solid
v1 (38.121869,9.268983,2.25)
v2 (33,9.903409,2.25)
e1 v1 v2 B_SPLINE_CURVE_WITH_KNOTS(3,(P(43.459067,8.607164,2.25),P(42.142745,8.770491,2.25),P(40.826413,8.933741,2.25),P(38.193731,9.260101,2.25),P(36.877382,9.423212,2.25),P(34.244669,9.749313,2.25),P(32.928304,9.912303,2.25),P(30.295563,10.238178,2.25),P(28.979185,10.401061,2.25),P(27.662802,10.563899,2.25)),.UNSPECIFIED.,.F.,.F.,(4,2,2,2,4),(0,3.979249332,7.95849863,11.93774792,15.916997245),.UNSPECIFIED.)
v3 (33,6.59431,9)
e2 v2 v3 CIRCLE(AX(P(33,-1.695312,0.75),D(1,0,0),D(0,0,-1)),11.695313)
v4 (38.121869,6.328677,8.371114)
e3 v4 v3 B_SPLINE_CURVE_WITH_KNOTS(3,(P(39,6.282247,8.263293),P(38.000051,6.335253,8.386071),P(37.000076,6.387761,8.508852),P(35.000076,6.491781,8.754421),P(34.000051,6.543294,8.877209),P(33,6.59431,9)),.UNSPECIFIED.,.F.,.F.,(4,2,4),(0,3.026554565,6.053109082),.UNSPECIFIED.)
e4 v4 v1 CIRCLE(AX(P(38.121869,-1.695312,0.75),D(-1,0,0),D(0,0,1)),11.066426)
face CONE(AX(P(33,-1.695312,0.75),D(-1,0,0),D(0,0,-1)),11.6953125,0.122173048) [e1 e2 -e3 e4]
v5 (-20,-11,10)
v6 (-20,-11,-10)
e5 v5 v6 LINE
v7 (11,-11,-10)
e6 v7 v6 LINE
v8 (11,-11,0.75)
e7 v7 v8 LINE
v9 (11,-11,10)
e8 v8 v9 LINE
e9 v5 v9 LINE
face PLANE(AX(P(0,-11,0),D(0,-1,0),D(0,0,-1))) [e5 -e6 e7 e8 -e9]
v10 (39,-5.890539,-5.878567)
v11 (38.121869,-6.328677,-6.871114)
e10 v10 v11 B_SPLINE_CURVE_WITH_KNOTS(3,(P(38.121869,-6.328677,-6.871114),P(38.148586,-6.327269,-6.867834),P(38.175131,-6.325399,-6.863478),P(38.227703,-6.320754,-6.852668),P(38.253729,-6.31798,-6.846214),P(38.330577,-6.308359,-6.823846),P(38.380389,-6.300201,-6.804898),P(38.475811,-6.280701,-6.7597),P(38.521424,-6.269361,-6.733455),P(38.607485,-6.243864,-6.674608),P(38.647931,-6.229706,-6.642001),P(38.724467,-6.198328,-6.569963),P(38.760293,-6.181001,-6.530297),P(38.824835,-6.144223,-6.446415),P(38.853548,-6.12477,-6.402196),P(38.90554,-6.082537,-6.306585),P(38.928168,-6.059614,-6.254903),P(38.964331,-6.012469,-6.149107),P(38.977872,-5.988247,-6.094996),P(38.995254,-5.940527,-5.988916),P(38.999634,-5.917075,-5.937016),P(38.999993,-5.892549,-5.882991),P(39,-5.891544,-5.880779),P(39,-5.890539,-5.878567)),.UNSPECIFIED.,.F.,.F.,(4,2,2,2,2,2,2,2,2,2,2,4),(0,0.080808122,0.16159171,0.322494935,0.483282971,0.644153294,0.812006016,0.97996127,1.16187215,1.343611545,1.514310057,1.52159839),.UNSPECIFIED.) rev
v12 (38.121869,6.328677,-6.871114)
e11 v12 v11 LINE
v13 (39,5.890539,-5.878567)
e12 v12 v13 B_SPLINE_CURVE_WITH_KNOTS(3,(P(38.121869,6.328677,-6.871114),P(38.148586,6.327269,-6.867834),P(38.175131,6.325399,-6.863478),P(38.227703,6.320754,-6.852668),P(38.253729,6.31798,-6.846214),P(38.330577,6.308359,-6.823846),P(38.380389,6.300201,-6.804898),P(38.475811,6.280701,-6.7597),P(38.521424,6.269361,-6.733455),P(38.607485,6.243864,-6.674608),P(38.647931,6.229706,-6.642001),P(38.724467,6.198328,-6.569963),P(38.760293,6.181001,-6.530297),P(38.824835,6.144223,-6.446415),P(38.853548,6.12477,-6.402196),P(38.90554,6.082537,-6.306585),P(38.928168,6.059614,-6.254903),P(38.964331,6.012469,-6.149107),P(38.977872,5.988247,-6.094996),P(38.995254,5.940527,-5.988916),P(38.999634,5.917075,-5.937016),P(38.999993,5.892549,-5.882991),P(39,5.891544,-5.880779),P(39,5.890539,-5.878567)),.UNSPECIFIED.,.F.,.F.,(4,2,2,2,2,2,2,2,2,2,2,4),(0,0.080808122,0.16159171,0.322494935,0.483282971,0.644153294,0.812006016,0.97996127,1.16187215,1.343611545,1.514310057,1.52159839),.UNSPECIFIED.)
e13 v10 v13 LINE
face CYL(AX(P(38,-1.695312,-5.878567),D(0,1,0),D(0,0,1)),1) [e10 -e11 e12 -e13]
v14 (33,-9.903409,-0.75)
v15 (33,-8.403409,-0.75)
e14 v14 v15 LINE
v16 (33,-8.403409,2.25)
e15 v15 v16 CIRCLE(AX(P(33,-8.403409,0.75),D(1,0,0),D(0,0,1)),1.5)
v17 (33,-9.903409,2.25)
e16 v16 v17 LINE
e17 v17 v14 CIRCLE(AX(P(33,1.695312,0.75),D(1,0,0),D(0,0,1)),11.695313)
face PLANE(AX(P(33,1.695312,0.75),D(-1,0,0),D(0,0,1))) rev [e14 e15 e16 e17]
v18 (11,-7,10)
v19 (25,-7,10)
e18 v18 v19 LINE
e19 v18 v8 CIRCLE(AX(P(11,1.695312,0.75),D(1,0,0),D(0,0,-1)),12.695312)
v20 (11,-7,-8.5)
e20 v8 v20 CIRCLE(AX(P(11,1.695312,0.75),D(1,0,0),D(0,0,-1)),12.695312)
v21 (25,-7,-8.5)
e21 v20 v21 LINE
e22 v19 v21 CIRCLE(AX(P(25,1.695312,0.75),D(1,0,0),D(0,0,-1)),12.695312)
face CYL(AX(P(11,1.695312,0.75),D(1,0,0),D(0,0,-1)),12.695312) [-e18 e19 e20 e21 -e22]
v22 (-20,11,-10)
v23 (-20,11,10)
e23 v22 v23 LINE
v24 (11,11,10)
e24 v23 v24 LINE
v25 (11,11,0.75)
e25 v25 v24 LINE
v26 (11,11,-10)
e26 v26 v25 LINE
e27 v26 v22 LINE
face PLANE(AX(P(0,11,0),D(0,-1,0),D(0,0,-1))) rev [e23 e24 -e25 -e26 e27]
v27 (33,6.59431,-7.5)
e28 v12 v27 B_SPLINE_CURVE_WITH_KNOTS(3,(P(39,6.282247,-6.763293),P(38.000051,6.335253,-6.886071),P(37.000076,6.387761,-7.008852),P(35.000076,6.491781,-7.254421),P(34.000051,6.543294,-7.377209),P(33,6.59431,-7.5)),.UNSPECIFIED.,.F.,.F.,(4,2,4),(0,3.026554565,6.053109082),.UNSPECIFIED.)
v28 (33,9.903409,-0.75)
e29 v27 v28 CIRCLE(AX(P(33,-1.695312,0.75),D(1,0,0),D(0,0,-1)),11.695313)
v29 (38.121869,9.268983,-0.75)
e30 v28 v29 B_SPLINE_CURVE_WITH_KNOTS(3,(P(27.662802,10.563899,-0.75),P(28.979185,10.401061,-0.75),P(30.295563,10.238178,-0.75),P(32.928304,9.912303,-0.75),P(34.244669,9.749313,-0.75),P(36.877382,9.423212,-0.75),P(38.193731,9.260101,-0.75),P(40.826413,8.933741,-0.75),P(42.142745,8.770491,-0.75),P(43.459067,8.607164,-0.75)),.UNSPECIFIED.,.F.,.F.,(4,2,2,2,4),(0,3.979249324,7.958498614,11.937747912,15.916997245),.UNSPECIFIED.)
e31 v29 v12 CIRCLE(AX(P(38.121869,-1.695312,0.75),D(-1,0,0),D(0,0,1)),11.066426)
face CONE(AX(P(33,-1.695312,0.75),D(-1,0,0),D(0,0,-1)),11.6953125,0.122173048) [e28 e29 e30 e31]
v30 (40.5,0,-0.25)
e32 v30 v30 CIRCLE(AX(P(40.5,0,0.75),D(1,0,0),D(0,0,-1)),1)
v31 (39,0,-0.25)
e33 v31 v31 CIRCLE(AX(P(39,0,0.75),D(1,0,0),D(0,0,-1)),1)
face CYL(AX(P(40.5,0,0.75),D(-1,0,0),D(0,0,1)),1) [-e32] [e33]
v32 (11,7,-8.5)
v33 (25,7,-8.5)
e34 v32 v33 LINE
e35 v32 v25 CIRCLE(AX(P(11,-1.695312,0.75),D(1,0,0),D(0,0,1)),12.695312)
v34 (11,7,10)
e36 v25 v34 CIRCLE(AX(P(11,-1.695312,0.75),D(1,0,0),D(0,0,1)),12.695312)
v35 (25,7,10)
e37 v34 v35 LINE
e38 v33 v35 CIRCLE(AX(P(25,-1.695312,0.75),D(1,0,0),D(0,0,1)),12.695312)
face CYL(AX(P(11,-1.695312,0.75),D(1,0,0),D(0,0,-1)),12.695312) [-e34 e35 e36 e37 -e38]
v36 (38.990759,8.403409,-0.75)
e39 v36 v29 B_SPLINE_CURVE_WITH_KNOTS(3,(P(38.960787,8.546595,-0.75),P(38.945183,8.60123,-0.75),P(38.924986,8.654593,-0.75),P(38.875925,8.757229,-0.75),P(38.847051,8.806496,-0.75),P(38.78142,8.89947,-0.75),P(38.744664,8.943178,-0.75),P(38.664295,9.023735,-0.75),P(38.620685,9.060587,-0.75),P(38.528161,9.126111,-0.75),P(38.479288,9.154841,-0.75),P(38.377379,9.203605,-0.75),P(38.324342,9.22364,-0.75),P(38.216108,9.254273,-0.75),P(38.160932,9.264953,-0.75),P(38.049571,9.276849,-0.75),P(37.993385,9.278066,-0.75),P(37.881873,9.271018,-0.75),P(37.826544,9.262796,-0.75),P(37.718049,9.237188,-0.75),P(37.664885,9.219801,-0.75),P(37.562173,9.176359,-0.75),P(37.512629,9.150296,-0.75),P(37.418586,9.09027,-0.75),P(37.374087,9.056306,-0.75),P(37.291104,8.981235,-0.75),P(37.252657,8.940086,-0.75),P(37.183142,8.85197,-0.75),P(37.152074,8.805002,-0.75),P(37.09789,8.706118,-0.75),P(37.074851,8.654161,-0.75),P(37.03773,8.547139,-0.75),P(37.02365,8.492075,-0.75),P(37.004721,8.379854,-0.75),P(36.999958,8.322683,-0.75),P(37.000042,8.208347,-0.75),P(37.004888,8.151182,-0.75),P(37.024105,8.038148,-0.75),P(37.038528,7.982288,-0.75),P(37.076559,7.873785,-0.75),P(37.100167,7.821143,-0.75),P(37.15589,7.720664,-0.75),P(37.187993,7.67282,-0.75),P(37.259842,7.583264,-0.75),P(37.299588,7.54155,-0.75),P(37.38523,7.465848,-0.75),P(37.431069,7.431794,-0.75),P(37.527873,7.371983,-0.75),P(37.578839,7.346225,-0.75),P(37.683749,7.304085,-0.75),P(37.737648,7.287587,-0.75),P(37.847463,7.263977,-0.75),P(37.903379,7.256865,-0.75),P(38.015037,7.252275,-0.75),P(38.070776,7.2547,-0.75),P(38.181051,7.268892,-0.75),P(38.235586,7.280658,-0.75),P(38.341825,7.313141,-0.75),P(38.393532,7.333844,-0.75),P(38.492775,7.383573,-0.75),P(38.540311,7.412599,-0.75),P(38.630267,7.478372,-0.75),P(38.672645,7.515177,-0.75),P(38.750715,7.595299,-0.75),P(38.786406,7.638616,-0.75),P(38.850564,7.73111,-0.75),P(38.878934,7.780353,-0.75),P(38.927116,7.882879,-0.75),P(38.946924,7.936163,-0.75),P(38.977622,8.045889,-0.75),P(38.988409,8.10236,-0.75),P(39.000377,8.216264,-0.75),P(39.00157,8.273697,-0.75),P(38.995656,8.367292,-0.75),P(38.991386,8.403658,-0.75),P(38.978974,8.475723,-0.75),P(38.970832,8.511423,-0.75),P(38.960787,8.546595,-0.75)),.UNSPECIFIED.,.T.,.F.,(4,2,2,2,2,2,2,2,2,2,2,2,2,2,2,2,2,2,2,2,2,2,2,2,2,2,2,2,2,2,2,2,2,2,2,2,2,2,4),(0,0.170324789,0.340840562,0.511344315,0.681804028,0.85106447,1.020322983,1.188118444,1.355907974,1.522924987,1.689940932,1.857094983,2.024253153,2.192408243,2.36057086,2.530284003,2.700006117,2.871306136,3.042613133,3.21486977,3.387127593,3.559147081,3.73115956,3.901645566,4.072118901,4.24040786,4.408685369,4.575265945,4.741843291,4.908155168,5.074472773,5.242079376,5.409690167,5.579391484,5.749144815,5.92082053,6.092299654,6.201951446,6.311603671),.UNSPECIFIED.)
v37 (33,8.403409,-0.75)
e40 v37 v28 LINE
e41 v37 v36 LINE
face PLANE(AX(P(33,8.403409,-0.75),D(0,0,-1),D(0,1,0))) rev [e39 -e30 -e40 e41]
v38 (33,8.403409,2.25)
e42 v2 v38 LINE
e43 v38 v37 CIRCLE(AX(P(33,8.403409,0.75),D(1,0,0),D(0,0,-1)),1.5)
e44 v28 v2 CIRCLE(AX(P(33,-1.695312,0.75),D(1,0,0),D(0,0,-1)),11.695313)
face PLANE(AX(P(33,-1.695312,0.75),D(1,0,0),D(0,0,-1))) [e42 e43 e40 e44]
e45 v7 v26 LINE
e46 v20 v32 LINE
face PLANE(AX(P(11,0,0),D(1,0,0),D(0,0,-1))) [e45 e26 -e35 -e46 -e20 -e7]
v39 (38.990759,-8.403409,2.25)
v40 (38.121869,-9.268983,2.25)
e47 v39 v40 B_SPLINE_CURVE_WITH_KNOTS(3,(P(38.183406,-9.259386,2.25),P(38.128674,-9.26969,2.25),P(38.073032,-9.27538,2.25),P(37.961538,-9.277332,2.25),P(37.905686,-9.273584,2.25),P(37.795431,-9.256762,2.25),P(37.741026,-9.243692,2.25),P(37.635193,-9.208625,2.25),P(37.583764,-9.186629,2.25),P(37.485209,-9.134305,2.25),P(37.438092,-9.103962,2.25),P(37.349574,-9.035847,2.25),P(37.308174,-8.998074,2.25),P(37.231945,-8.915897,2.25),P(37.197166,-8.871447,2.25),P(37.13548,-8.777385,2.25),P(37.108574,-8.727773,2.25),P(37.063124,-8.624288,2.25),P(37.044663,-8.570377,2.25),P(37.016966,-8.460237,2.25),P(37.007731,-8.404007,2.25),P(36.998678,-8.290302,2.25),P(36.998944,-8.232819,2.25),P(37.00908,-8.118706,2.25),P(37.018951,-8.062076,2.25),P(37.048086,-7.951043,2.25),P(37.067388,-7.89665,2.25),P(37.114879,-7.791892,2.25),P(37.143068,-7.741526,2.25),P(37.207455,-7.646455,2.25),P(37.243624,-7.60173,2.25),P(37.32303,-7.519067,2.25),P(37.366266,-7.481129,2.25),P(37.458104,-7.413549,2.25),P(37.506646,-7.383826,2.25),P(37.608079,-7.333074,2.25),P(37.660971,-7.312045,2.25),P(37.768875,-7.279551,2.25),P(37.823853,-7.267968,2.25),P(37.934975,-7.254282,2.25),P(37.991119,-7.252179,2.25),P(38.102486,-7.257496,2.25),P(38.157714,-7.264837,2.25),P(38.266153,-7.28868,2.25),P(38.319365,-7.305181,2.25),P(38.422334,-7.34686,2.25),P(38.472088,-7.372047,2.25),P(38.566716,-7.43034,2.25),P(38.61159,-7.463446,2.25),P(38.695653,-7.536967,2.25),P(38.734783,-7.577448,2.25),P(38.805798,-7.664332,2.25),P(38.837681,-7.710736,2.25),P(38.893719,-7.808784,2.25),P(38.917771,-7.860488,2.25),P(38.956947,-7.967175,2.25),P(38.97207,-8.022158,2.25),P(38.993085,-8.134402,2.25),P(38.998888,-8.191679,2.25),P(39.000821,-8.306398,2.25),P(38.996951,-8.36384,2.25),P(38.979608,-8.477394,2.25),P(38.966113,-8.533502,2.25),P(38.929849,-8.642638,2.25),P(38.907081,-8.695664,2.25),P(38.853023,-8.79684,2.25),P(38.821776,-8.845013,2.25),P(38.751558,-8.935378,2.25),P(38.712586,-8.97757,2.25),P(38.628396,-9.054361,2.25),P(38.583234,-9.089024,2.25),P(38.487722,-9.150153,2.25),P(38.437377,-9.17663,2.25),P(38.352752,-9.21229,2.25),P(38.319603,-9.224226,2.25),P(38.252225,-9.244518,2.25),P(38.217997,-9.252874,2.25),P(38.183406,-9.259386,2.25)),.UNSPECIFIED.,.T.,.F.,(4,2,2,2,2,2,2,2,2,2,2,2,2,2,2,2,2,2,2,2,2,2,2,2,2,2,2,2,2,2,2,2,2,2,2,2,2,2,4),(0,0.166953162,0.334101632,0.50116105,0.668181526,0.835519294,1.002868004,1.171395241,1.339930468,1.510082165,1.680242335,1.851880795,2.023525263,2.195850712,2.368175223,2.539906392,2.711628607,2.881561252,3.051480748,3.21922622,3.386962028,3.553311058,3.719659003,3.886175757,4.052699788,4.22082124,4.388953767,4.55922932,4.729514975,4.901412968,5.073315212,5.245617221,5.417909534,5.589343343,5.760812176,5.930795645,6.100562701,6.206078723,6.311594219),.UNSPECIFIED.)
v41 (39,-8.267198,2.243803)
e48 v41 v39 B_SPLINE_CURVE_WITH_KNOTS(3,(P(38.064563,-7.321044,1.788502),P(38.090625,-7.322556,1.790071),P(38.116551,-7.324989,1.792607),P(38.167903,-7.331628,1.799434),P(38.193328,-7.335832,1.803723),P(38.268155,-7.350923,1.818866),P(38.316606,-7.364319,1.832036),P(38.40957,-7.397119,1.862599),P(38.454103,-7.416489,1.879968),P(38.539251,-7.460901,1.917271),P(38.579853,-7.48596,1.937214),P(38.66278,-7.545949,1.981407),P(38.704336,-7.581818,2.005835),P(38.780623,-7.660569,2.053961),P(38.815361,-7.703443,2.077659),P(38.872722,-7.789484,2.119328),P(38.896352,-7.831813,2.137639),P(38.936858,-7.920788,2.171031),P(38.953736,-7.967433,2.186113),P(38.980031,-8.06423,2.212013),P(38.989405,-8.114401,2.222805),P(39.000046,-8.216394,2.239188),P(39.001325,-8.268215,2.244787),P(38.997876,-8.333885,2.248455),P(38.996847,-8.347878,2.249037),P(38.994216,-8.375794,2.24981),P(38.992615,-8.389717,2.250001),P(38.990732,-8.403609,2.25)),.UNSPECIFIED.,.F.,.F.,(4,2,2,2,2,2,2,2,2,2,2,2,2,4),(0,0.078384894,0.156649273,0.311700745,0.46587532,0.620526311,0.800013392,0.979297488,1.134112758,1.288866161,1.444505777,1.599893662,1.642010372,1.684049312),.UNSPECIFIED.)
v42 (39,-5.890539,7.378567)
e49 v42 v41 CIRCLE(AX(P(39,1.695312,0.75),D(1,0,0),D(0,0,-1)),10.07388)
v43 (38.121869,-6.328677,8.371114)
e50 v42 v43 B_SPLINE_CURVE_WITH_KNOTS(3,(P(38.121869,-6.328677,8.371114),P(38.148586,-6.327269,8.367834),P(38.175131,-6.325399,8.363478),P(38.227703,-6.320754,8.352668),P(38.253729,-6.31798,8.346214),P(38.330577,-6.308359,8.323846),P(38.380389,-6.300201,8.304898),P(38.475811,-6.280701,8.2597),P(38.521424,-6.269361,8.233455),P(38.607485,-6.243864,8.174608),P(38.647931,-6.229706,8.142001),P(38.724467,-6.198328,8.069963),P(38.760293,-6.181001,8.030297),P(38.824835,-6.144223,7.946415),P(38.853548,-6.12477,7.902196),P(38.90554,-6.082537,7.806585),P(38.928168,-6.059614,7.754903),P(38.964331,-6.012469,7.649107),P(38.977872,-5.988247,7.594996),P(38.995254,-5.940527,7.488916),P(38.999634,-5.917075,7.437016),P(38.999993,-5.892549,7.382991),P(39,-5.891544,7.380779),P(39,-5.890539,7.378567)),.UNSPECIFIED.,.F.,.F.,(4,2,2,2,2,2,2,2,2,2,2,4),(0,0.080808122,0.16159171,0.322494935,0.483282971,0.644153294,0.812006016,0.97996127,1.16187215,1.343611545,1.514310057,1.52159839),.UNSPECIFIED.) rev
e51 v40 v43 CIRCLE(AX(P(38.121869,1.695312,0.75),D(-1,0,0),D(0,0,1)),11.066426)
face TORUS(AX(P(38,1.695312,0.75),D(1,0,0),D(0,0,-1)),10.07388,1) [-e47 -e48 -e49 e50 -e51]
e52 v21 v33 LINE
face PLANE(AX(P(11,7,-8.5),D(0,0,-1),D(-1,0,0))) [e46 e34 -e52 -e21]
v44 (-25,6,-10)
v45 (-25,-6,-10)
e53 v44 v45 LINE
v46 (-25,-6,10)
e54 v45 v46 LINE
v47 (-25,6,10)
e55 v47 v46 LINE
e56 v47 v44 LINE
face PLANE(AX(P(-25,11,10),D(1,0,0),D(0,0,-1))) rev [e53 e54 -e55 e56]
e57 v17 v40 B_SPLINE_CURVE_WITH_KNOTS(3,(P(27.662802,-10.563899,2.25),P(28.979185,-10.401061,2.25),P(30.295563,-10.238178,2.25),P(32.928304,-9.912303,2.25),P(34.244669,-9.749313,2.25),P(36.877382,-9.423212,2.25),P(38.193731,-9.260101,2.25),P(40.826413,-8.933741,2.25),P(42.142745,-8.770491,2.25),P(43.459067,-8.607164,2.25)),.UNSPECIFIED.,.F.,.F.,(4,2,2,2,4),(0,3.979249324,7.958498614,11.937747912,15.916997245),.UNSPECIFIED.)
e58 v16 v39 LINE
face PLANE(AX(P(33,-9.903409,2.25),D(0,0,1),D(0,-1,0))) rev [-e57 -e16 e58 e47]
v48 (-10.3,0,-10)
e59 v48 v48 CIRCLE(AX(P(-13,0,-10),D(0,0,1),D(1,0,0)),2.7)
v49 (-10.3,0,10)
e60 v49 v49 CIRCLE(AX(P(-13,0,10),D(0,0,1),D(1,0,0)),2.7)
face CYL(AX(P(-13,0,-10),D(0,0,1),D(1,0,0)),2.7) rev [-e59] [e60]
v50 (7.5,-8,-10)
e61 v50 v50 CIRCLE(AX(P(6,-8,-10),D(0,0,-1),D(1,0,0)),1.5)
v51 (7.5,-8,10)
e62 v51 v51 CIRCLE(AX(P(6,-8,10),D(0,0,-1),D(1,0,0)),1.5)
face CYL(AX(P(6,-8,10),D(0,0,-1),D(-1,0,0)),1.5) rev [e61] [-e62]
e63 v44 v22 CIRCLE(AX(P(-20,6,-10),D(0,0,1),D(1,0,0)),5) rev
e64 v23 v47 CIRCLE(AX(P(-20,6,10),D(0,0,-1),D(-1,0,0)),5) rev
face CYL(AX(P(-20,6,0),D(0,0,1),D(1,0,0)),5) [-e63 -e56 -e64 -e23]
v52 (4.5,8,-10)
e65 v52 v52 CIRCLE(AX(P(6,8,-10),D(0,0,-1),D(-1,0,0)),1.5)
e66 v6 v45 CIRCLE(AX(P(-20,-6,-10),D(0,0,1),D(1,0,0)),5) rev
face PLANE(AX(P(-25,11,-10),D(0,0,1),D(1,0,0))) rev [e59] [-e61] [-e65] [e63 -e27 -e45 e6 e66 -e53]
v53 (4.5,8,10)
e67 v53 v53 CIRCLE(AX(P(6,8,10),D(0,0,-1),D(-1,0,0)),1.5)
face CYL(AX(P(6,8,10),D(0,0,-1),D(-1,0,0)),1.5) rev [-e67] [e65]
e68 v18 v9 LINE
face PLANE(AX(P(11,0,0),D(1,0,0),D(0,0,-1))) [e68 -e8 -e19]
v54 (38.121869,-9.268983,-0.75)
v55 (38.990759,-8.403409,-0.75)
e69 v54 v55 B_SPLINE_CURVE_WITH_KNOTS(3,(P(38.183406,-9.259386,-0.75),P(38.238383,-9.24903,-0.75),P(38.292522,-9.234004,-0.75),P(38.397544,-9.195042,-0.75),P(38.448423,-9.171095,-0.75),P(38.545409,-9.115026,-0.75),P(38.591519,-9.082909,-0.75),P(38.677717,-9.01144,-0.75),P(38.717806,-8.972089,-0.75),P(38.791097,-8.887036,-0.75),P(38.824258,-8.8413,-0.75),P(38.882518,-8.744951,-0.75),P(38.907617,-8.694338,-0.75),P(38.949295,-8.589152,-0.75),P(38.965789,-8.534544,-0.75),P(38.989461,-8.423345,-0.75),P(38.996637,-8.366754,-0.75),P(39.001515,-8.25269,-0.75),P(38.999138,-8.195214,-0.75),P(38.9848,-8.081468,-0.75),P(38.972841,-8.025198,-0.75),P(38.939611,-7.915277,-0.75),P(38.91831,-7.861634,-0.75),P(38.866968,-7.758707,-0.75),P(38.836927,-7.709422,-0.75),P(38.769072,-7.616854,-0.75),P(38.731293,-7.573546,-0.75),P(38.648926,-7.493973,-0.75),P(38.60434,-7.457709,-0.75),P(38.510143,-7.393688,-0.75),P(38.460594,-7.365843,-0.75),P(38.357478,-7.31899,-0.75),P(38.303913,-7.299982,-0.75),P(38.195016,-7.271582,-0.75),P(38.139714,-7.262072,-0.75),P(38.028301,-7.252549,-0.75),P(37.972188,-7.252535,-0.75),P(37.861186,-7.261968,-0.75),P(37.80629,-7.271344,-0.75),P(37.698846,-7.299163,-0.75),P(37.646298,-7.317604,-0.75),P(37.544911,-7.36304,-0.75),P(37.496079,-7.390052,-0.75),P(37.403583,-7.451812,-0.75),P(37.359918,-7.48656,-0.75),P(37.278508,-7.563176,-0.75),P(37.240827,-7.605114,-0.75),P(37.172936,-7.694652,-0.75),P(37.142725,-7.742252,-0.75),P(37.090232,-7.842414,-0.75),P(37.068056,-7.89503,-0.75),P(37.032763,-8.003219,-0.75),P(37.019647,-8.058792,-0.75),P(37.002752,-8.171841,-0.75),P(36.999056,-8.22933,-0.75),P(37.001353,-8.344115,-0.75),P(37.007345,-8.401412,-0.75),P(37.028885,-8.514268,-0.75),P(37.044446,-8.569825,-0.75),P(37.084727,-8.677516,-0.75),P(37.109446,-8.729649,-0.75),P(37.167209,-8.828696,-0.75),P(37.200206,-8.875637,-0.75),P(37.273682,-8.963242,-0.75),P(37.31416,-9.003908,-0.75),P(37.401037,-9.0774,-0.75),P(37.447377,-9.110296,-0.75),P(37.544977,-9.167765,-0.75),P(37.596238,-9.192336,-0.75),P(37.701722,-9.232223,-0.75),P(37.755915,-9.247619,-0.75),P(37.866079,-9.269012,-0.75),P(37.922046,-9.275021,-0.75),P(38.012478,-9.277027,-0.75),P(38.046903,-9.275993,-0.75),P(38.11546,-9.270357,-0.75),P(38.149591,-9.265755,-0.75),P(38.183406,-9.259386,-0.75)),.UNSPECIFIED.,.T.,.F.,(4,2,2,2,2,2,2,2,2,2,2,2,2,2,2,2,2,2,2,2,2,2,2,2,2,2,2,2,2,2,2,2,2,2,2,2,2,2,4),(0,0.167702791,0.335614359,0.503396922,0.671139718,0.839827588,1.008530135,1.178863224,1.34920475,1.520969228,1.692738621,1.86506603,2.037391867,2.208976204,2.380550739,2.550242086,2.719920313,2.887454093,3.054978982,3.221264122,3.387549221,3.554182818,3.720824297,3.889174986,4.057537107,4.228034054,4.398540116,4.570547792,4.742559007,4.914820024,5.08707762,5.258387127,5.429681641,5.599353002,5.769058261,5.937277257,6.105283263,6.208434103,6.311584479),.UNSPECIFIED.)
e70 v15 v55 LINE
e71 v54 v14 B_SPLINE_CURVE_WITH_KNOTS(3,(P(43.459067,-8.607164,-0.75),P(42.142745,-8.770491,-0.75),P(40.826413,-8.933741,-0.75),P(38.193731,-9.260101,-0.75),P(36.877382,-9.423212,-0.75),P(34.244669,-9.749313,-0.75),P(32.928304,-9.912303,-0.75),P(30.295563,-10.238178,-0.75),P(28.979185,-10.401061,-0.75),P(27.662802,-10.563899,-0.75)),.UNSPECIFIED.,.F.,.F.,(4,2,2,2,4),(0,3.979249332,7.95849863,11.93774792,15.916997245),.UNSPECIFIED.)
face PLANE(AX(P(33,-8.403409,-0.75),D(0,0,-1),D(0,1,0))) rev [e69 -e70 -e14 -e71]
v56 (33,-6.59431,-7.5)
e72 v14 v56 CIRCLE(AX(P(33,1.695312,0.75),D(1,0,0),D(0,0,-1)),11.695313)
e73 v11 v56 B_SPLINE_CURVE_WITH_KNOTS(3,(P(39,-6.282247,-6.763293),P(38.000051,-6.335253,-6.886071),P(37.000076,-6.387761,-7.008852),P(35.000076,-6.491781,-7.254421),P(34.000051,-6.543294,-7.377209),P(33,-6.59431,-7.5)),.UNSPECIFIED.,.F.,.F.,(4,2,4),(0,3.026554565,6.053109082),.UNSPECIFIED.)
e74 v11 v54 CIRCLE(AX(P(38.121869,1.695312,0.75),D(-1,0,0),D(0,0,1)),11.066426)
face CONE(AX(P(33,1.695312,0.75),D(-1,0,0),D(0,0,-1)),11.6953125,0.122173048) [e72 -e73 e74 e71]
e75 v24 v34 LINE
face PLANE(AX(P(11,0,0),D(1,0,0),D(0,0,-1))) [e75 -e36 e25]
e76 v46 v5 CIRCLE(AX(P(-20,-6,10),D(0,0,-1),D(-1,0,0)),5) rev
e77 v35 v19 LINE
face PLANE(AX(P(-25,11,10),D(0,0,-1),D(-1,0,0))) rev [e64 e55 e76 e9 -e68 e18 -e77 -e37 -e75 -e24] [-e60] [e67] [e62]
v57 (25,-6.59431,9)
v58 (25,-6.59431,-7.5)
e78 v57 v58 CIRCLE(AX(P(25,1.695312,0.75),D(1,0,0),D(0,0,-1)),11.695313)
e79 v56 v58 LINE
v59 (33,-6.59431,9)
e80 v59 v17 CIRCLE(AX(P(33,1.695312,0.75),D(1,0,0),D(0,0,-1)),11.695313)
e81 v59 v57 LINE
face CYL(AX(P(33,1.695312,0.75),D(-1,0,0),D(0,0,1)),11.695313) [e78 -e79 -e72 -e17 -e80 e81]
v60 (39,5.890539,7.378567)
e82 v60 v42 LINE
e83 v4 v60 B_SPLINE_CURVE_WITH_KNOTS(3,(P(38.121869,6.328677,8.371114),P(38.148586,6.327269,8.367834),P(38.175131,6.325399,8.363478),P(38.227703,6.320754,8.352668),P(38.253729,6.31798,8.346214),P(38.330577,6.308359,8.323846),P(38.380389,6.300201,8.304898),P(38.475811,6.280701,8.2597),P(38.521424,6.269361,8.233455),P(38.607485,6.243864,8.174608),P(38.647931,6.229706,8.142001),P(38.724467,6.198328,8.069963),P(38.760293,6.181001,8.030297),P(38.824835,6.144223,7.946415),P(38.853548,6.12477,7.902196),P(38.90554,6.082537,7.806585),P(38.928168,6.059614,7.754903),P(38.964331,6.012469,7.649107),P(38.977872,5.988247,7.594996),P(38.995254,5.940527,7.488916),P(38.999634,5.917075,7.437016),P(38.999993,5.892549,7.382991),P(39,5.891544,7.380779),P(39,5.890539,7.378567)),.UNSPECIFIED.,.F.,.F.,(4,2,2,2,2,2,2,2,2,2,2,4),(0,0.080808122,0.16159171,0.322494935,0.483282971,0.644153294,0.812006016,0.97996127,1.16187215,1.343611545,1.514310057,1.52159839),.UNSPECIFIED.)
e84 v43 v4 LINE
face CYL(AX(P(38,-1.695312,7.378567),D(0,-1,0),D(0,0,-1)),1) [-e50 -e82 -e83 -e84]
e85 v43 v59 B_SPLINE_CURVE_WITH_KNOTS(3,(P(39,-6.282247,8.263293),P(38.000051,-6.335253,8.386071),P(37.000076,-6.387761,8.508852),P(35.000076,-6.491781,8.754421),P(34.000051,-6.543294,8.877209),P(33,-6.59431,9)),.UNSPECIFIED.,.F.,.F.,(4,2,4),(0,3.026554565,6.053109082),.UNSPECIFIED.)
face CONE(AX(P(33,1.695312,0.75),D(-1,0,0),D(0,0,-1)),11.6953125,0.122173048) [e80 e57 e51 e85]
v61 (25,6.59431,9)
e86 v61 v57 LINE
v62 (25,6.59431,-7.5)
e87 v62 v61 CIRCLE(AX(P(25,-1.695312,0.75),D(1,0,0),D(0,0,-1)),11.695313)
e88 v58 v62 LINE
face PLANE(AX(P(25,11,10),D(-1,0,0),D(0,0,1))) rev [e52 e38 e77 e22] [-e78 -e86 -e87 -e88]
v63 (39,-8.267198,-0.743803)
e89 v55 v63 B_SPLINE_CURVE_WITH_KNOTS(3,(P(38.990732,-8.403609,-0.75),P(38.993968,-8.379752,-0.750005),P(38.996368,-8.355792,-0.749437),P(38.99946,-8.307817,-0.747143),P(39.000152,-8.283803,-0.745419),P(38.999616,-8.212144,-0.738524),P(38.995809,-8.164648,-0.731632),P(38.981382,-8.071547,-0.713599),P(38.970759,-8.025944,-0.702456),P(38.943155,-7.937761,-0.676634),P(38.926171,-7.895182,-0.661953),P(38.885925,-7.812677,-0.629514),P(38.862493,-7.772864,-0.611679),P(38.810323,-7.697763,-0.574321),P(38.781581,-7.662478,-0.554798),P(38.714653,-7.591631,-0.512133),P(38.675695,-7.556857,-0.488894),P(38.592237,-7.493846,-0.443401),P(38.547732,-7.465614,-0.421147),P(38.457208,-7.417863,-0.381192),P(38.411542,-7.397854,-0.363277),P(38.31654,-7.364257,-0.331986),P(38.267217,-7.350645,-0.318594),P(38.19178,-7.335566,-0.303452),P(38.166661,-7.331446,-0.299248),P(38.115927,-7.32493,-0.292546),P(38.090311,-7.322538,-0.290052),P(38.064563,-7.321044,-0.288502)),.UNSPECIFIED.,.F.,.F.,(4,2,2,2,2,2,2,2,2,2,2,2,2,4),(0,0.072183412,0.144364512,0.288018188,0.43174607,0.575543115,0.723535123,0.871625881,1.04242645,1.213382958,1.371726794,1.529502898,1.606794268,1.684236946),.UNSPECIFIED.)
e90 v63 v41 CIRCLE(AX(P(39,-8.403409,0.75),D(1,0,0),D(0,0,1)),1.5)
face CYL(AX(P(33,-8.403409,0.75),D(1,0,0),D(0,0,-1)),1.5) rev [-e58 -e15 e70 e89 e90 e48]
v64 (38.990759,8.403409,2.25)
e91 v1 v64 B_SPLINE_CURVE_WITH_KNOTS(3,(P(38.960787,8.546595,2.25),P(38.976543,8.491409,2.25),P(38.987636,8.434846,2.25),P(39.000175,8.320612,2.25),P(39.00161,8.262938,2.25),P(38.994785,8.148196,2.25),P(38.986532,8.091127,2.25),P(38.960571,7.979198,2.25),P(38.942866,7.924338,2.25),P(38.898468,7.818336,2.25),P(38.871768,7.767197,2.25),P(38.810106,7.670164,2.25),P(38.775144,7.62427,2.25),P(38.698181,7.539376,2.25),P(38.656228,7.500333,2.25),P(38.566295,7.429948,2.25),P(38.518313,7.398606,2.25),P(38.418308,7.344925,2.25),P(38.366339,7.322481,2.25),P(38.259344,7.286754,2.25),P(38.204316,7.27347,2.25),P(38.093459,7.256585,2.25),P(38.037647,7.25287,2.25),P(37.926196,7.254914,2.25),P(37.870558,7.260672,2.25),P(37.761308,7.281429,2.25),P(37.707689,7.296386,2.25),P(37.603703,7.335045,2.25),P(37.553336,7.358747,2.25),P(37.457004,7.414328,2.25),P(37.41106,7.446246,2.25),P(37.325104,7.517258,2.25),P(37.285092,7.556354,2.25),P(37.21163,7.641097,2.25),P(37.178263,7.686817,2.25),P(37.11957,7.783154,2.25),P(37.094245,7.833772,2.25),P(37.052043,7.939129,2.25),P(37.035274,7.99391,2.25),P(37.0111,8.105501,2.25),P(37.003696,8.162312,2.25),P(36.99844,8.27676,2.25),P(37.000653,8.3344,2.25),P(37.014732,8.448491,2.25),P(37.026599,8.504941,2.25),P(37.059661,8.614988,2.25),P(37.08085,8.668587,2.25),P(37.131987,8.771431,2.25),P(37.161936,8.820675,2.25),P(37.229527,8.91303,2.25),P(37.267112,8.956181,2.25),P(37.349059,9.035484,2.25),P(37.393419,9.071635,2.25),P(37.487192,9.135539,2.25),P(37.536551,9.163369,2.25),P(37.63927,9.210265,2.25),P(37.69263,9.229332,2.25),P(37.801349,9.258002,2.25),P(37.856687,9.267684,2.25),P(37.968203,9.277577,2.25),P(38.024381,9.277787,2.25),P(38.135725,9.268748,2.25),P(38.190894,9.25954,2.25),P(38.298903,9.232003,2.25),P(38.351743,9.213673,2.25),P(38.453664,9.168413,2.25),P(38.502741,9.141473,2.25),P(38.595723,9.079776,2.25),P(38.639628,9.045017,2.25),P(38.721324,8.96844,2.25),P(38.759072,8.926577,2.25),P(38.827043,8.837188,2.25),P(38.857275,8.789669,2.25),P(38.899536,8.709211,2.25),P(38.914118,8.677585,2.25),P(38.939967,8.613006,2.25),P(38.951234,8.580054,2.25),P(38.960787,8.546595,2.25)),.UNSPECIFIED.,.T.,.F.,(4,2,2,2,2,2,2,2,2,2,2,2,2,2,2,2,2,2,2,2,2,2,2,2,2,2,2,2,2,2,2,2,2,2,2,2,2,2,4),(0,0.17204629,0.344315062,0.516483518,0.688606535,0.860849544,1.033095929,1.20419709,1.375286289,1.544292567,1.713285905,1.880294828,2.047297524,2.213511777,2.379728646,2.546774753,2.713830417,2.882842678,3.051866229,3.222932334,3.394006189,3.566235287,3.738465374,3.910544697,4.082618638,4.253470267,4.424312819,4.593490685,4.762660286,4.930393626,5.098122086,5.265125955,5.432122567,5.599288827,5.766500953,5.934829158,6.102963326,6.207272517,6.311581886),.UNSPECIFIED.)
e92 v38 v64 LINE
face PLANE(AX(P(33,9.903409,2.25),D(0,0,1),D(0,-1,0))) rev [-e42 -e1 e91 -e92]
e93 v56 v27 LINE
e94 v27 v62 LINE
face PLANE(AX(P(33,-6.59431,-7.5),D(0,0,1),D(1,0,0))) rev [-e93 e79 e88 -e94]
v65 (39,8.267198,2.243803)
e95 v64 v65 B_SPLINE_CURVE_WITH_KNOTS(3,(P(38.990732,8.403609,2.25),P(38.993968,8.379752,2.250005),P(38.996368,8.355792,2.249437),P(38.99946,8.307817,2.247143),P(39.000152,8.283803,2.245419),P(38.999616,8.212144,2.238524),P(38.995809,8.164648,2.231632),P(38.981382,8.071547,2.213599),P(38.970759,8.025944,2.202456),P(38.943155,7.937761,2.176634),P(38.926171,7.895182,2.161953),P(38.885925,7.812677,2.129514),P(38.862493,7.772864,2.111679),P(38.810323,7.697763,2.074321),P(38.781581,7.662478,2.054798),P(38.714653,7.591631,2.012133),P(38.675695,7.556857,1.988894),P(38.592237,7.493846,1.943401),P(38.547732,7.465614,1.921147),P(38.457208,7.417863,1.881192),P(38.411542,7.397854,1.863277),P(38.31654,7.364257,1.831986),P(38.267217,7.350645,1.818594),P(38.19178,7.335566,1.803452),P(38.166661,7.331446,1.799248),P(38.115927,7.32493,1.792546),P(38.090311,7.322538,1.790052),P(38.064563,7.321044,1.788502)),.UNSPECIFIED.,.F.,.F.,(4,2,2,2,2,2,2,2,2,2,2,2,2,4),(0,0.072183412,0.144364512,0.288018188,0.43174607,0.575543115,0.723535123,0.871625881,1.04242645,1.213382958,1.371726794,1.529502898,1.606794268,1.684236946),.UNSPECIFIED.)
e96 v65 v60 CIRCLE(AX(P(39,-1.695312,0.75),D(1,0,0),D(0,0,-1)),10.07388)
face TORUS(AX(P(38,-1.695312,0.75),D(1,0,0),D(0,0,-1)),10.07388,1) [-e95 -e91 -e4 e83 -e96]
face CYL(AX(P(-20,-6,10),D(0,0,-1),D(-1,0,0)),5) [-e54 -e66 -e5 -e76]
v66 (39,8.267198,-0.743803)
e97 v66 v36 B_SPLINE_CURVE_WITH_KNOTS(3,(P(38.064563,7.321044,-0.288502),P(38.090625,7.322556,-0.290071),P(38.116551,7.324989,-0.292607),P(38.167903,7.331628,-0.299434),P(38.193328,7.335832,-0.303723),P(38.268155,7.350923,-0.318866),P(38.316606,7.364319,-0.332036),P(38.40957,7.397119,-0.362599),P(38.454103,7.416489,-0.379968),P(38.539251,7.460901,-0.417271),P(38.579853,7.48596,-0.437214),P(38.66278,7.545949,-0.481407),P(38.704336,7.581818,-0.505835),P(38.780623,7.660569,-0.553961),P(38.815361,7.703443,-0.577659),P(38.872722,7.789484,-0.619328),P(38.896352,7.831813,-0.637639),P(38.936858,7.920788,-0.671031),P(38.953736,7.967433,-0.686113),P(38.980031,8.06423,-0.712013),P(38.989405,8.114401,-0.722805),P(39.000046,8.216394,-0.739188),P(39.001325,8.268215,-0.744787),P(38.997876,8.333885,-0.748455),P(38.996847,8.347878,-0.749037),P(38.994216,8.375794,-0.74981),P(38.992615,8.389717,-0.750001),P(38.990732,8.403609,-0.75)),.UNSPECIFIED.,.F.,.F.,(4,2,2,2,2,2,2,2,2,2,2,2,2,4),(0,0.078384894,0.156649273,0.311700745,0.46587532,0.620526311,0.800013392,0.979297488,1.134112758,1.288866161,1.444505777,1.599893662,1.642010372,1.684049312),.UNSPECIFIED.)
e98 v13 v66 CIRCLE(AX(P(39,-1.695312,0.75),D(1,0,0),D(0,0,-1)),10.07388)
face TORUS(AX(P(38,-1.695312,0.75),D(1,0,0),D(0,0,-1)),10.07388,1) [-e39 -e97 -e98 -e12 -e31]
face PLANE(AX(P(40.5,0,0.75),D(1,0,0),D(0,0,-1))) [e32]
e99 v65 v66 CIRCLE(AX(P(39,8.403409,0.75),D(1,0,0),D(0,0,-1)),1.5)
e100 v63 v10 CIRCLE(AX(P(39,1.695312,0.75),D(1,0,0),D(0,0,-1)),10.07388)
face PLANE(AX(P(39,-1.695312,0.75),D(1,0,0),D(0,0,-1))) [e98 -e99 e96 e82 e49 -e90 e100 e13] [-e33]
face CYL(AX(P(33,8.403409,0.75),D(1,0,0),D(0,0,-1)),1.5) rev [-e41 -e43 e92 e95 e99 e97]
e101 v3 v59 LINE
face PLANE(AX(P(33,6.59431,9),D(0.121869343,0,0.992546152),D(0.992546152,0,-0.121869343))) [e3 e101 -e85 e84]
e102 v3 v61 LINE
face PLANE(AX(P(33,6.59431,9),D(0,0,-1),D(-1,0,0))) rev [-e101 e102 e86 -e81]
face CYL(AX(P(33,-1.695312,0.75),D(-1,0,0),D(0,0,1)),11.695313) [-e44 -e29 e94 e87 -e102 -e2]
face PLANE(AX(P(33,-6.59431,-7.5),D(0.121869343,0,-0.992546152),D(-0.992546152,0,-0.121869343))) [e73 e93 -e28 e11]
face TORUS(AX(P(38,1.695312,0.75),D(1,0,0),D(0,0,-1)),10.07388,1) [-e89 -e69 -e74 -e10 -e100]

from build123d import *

# Parameters (mm, degrees)
CROQUIS1_W               = 50
CROQUIS1_H               = 20
SALIENTE_EXTRUIR1_DEPTH  = 11
REDONDEO1_R              = 5
CROQUIS2_OUTSIDE_W       = 33.634
CROQUIS2_OUTSIDE_H       = 35.634
CORTAR_EXTRUIR1_DEPTH    = 14
CROQUIS3_R               = 1.5
CORTAR_EXTRUIR2_DEPTH    = 34.85262176
SALIENTE_EXTRUIR6_DEPTH  = 8
CROQUIS9_R               = 2.7
CORTAR_EXTRUIR5_DEPTH    = 41.124805295
SALIENTE_EXTRUIR7_DEPTH  = 6
SALIENTE_EXTRUIR7_DRAFT  = 7
REDONDEO2_R              = 1
CORTAR_EXTRUIR6_START    = -6
CORTAR_EXTRUIR6_DEPTH    = 6
CROQUIS15_W              = 2
CROQUIS15_H              = 5
SALIENTE_EXTRUIR10_DEPTH = 5.5
CROQUIS16_R              = 1.5
CORTAR_EXTRUIR7_DEPTH    = 42.988093643
CROQUIS17_R              = 1
SALIENTE_EXTRUIR11_DEPTH = 1.5
CORTAR_EXTRUIR8_START    = -5.5
CROQUIS18_W              = 2
CROQUIS18_H              = 5
CORTAR_EXTRUIR8_DEPTH    = 79.039644333


with BuildPart() as part:
    # Croquis1 → Saliente-Extruir1 (new, symmetric)
    with BuildSketch(Plane(origin=(0, 0, 0), x_dir=(1, 0, 0), z_dir=(0, 1, 0))):
        Rectangle(CROQUIS1_W, CROQUIS1_H)
    extrude(amount=SALIENTE_EXTRUIR1_DEPTH, both=True)

    # Redondeo1
    redondeo1_edges = [part.edges().sort_by_distance(p)[0] for p in [
        (-25, 11, 0),
        (-25, -11, 0),
    ]]
    fillet(redondeo1_edges, radius=REDONDEO1_R)

    # Croquis2 outside → Cortar-Extruir1 (cut)
    with BuildSketch(Plane(origin=(25, 0, 0), x_dir=(0, 0, -1), z_dir=(1, 0, 0))):
        Rectangle(CROQUIS2_OUTSIDE_W, CROQUIS2_OUTSIDE_H)
        with BuildLine():
            Line((-10, 7), (-10, -7))
            ThreePointArc((-10, -7), (-0.75, -11), (8.5, -7))
            Line((8.5, -7), (8.5, 7))
            ThreePointArc((8.5, 7), (-0.75, 11), (-10, 7))
        make_face(mode=Mode.SUBTRACT)
    extrude(amount=-CORTAR_EXTRUIR1_DEPTH, mode=Mode.SUBTRACT)

    # Croquis3 → Cortar-Extruir2 (cut, through all)
    with BuildSketch(Plane(origin=(0, 0, -10), x_dir=(-1, 0, 0), z_dir=(0, 0, -1))):
        with Locations((-6, 8)):
            Circle(CROQUIS3_R)
        with Locations(Location((-6, -8, 0), (0, 0, 180))):
            Circle(CROQUIS3_R)
    extrude(amount=-CORTAR_EXTRUIR2_DEPTH, mode=Mode.SUBTRACT)

    # Croquis8 → Saliente-Extruir6 (add)
    with BuildSketch(Plane(origin=(25, 0, 0), x_dir=(0, 0, -1), z_dir=(1, 0, 0))):
        with BuildLine():
            Line((-9, 6.594309595), (-9, -6.594309595))
            ThreePointArc((-9, -6.594309595), (-0.75, -10), (7.5, -6.594309595))
            Line((7.5, -6.594309595), (7.5, 6.594309595))
            ThreePointArc((7.5, 6.594309595), (-0.75, 10), (-9, 6.594309595))
        make_face()
    extrude(amount=SALIENTE_EXTRUIR6_DEPTH)

    # Croquis9 → Cortar-Extruir5 (cut, through all)
    with BuildSketch(Plane.XY.offset(10)):
        with Locations((-13, 0)):
            Circle(CROQUIS9_R)
    extrude(amount=-CORTAR_EXTRUIR5_DEPTH, mode=Mode.SUBTRACT)


with BuildPart() as saliente_extruir7_tool:
    # Croquis11 → Saliente-Extruir7 (with draft: the straight prism first)
    with BuildSketch(Plane(origin=(33, 0, 0), x_dir=(0, 0, -1), z_dir=(1, 0, 0))):
        with BuildLine():
            Line((-9, 6.594309595), (-9, -6.594309595))
            ThreePointArc((-9, -6.594309595), (-0.75, -10), (7.5, -6.594309595))
            Line((7.5, -6.594309595), (7.5, 6.594309595))
            ThreePointArc((7.5, 6.594309595), (-0.75, 10), (-9, 6.594309595))
        make_face()
    extrude(amount=SALIENTE_EXTRUIR7_DEPTH)
    # Saliente-Extruir7: the draft: its side faces are tilted about the plane it starts from
    saliente_extruir7_sides = [saliente_extruir7_tool.faces().sort_by_distance(p)[0] for p in [
        (36, 0, 9),
        (36, -10, 0.75),
        (36, 0, -7.5),
        (36, 10, 0.75),
    ]]
    draft(saliente_extruir7_sides, Plane(origin=(33, 0, 0), x_dir=(0, 0, -1), z_dir=(1, 0, 0)), SALIENTE_EXTRUIR7_DRAFT)


with BuildPart() as part_1:
    add(part.part)

    # Saliente-Extruir7: add saliente_extruir7_tool
    add(saliente_extruir7_tool.part)

    # Redondeo2
    redondeo2_edges = [part_1.edges().sort_by_distance(p)[0] for p in [
        (39, 0, -6.763292635),
        (39, -9.263292635, 0.75),
        (39, 0, 8.263292635),
        (39, 9.263292635, 0.75),
    ]]
    fillet(redondeo2_edges, radius=REDONDEO2_R - 0.0001)  # a hair under: the kernel refuses the full size

    # Croquis14 → Cortar-Extruir6 (cut)
    with BuildSketch(Plane(origin=(39, 0, 0), x_dir=(0, 0, -1), z_dir=(1, 0, 0)).offset(CORTAR_EXTRUIR6_START)):
        with BuildLine():
            Line((-2.25, 9.903408743), (-2.25, 8.403408743))
            ThreePointArc((-2.25, 8.403408743), (-0.75, 6.903408743), (0.75, 8.403408743))
            Line((0.75, 8.403408743), (0.75, 9.903408743))
            ThreePointArc((0.75, 9.903408743), (-0.75, 10), (-2.25, 9.903408743))
        make_face()
        with BuildLine():
            Line((-2.25, -9.903408743), (-2.25, -8.403408743))
            ThreePointArc((-2.25, -8.403408743), (-0.75, -6.903408743), (0.75, -8.403408743))
            Line((0.75, -8.403408743), (0.75, -9.903408743))
            ThreePointArc((0.75, -9.903408743), (-0.75, -10), (-2.25, -9.903408743))
        make_face()
    extrude(amount=CORTAR_EXTRUIR6_DEPTH, mode=Mode.SUBTRACT)

    # Croquis15 → Saliente-Extruir10 (add)
    with BuildSketch(Plane.ZY.offset(25)):
        Rectangle(CROQUIS15_W, CROQUIS15_H)
    extrude(amount=SALIENTE_EXTRUIR10_DEPTH)

    # Croquis16 → Cortar-Extruir7 (cut, through all)
    with BuildSketch(Plane.XY.offset(1)):
        with Locations((-27.75, 0)):
            Circle(CROQUIS16_R)
    extrude(amount=-CORTAR_EXTRUIR7_DEPTH, mode=Mode.SUBTRACT)

    # Croquis17 → Saliente-Extruir11 (add)
    with BuildSketch(Plane(origin=(39, 0, 0), x_dir=(0, 0, -1), z_dir=(1, 0, 0))):
        with Locations((-0.75, 0)):
            Circle(CROQUIS17_R)
    extrude(amount=SALIENTE_EXTRUIR11_DEPTH)

    # Croquis18 → Cortar-Extruir8 (cut, through all)
    with BuildSketch(Plane.ZY.offset(30.5).offset(CORTAR_EXTRUIR8_START)):
        Rectangle(CROQUIS18_W, CROQUIS18_H)
    extrude(amount=CORTAR_EXTRUIR8_DEPTH, mode=Mode.SUBTRACT)


solid = part_1.part
